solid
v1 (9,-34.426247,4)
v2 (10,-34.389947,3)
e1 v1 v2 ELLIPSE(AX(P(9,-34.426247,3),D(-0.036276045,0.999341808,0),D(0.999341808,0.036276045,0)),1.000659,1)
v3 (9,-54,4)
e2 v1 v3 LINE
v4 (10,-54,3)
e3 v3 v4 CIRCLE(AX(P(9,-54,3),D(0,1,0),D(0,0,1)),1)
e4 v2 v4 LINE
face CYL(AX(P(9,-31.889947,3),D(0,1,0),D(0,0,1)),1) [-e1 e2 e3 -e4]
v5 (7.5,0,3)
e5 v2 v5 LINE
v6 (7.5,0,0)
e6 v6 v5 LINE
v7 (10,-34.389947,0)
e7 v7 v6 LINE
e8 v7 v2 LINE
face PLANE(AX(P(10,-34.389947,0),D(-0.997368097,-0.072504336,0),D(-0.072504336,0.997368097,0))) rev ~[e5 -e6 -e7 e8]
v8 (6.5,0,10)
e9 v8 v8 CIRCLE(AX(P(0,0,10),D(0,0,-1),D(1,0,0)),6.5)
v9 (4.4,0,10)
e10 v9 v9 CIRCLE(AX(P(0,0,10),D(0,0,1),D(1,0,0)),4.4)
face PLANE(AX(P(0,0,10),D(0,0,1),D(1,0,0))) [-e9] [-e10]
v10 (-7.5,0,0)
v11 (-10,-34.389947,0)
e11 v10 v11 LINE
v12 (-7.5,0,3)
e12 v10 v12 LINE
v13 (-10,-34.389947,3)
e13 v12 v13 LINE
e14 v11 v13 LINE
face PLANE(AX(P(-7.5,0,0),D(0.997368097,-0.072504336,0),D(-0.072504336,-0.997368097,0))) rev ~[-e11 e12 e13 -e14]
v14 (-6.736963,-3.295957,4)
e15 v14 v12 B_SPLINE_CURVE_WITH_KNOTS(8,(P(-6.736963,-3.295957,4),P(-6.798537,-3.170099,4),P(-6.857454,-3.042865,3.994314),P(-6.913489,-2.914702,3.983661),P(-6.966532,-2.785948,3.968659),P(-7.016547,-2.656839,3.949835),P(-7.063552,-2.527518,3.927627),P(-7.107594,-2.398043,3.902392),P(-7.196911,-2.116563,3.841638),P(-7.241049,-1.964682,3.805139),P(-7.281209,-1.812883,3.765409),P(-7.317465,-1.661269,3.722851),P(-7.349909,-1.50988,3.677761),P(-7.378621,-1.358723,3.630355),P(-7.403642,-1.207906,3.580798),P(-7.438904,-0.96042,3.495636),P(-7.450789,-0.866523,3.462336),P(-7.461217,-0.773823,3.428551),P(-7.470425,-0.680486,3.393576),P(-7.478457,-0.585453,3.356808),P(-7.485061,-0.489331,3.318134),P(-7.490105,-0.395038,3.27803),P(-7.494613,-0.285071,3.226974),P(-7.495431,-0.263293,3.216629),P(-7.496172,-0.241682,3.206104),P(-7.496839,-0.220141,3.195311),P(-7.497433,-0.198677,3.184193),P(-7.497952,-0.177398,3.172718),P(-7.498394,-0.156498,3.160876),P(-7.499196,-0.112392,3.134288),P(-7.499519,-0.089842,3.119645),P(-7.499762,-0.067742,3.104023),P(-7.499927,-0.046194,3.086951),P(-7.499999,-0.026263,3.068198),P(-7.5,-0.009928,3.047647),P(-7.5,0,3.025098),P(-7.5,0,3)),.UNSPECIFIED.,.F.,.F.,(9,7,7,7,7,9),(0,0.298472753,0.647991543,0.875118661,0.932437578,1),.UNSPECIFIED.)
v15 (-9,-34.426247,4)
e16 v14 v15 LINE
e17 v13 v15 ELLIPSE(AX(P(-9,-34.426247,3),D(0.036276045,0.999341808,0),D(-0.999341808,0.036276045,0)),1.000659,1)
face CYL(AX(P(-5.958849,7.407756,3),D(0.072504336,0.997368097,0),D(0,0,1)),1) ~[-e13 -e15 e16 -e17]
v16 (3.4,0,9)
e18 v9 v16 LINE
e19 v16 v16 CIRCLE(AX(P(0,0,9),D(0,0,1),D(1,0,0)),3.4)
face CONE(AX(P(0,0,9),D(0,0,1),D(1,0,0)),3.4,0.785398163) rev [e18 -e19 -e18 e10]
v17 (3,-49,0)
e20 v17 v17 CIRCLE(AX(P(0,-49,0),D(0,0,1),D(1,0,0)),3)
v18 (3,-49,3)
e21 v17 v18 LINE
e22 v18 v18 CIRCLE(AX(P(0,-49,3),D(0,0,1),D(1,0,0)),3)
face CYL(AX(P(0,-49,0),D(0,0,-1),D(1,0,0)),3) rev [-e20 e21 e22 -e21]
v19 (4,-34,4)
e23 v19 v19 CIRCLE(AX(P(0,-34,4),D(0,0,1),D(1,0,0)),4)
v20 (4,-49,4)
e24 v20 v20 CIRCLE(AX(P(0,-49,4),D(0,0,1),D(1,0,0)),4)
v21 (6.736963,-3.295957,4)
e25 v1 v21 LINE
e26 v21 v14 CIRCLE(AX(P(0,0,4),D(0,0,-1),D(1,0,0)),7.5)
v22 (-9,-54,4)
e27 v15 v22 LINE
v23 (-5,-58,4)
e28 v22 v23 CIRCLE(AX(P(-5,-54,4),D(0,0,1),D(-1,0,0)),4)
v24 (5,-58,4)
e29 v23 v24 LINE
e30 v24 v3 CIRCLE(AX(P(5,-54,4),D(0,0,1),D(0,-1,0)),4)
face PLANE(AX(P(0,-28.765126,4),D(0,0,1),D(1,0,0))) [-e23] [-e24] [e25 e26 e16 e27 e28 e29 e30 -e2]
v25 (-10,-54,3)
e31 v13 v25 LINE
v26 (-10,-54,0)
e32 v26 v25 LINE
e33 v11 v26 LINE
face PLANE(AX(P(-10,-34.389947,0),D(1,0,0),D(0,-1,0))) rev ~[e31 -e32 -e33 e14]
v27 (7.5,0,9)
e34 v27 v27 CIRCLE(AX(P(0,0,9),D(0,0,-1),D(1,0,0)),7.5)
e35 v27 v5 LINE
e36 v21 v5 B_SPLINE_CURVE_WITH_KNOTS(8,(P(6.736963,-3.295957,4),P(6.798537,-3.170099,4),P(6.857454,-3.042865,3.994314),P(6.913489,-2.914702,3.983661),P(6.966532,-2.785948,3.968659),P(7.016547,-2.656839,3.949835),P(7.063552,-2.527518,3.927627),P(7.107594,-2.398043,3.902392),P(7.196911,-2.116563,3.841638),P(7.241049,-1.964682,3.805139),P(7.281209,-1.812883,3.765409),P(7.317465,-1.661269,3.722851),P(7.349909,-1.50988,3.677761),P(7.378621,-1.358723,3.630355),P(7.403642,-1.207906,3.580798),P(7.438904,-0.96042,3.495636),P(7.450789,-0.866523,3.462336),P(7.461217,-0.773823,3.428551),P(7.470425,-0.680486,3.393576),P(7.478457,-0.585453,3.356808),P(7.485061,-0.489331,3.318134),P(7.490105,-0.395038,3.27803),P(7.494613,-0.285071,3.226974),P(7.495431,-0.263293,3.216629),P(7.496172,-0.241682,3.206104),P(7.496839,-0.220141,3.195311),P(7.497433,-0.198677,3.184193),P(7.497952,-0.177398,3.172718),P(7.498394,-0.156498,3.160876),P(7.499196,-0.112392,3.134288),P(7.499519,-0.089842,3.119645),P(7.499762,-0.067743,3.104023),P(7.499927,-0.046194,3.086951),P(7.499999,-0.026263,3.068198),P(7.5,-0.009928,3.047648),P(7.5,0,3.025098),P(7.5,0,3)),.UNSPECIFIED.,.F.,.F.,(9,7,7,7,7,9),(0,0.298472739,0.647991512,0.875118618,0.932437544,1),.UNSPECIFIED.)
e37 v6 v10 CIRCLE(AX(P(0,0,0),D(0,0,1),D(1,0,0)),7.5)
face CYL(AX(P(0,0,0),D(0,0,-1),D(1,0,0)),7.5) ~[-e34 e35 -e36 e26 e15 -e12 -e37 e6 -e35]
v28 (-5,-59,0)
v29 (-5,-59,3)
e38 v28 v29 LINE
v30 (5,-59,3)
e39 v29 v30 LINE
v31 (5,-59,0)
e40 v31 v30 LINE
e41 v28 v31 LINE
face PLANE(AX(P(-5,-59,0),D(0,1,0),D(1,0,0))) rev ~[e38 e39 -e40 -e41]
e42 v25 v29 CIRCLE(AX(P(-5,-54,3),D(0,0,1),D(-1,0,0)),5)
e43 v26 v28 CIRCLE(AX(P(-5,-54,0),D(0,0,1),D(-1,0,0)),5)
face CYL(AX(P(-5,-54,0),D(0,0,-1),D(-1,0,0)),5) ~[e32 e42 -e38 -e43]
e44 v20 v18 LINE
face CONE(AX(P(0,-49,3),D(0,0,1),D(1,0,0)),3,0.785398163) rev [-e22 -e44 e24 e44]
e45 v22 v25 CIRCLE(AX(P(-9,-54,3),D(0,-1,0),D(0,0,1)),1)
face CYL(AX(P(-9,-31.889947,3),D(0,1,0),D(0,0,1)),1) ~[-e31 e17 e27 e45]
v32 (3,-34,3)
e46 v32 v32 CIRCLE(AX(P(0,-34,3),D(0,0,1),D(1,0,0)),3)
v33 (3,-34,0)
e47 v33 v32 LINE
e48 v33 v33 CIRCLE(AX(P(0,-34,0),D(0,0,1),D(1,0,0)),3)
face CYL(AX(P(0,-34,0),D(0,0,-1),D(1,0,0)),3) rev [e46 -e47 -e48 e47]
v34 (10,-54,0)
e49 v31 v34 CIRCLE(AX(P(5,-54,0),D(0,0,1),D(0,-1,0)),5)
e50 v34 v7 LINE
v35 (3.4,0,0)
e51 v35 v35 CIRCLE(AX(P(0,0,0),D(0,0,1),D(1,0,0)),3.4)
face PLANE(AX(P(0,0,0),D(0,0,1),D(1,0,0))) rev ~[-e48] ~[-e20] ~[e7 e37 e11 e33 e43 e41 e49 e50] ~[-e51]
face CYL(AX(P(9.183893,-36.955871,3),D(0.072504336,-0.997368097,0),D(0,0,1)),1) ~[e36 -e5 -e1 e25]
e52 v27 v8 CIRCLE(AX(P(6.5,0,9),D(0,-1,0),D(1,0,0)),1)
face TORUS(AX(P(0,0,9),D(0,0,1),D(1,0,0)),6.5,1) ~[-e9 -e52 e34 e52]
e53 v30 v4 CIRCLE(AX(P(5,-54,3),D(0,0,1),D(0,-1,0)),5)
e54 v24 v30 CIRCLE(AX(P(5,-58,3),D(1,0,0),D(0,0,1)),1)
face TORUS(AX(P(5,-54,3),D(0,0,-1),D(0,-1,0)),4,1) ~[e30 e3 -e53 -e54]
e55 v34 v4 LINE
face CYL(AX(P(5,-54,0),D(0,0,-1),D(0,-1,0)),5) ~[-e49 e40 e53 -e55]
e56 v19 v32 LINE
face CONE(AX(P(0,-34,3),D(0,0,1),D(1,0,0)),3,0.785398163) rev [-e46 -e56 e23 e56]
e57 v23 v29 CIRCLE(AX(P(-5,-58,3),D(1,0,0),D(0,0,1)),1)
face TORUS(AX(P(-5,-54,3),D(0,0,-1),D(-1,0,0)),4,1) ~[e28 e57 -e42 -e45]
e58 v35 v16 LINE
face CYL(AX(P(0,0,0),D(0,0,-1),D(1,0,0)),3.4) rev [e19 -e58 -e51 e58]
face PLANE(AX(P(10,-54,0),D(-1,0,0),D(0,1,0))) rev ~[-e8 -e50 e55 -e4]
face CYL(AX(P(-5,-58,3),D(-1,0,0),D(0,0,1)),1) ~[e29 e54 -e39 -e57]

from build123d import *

# Parameters (mm, degrees)
F0_R         = 3
F1_DEPTH     = 4
F0_R_2       = 3.4
F2_DEPTH     = 10
F3_SIZE      = 1
F4_T1_DEPTH  = 22.1100533903
F4_T3_DEPTH  = 10
F4_T10_DEPTH = 44.4806964521
F4_S11_R     = 7.5
F4_T12_DEPTH = 24
F4_T14_ANGLE = 90
F4_T18_DEPTH = 44.4806964521
F4_S19_R     = 7.5
F4_T20_DEPTH = 24
F4_T22_ANGLE = 90


# Not quite as in the source:
# - a fillet or chamfer that OpenCascade refuses, or shapes differently, is made with other operations: its cross-section is extruded or revolved along the edge and cut away or added


with BuildPart() as f1:
    # F0 (on Top) → F1 (new body)
    with BuildSketch(Plane.XY):
        with BuildLine():
            Line((10, -34.3899466097), (7.5, 0))
            ThreePointArc((7.5, 0), (0, -7.5), (-7.5, 0))
            Line((-7.5, 0), (-10, -34.3899466097))
            Line((-10, -34.3899466097), (-10, -54))
            ThreePointArc((-10, -54), (-8.5355339059, -57.5355339059), (-5, -59))
            Line((-5, -59), (5, -59))
            ThreePointArc((5, -59), (8.5355339059, -57.5355339059), (10, -54))
            Line((10, -54), (10, -34.3899466097))
        make_face()
        with Locations((0, -49)):
            Circle(F0_R, mode=Mode.SUBTRACT)
        with Locations((0, -34)):
            Circle(F0_R, mode=Mode.SUBTRACT)
    extrude(amount=F1_DEPTH)

    # F0 (on Top) → F2 (join)
    with BuildSketch(Plane.XY):
        with BuildLine():
            ThreePointArc((-7.5, 0), (0, -7.5), (7.5, 0))
            ThreePointArc((7.5, 0), (0, 7.5), (-7.5, 0))
        make_face()
        Circle(F0_R_2, mode=Mode.SUBTRACT)
    extrude(amount=F2_DEPTH)

    # F3
    f3_edges = [f1.edges().sort_by_distance(p)[0] for p in [
        (-3, -34, 4),
        (-3, -49, 4),
        (-3.4, 0, 10),
    ]]
    chamfer(f3_edges, length=F3_SIZE)

    # F4: fillet of radius 1 on 5 edges, made by hand

    # F4_s2 → F4_t1 (cut)
    with BuildSketch(Plane.XZ.offset(31.8899466097)):
        with BuildLine():
            ThreePointArc((-9, 4), (-9.7071067812, 3.7071067812), (-10, 3))
            Line((-10, 3), (-10, 4))
            Line((-10, 4), (-9, 4))
        make_face()
        with BuildLine():
            ThreePointArc((9, 4), (9.7071067812, 3.7071067812), (10, 3))
            Line((10, 3), (10, 4))
            Line((10, 4), (9, 4))
        make_face()
    extrude(amount=F4_T1_DEPTH, mode=Mode.SUBTRACT)

    # F4_s4 → F4_t3 (cut)
    with BuildSketch(Plane.YZ.offset(-5)):
        with BuildLine():
            ThreePointArc((-58, 4), (-58.7071067812, 3.7071067812), (-59, 3))
            Line((-59, 3), (-59, 4))
            Line((-59, 4), (-58, 4))
        make_face()
    extrude(amount=F4_T3_DEPTH, mode=Mode.SUBTRACT)

    # F4_s5 → F4_t6 (revolve, cut)
    with BuildSketch(Plane.XZ):
        with BuildLine():
            ThreePointArc((7.5, 9), (7.2071067812, 9.7071067812), (6.5, 10))
            Line((6.5, 10), (7.5, 10))
            Line((7.5, 10), (7.5, 9))
        make_face()
    revolve(axis=Axis((0, 0, 10), (0, 0, -1)), mode=Mode.SUBTRACT)


with BuildPart() as f4_tool8:
    # F4_s9 → F4_t10 (new body)
    with BuildSketch(Plane(origin=(0.5043559293, 6.9379093918, 0), x_dir=(0, 0, 1), z_dir=(-0.072504336, -0.9973680972, 0))):
        with BuildLine():
            ThreePointArc((4, 6.4802607288), (3.7071067812, 7.18736751), (3, 7.4802607288))
            Line((3, 7.4802607288), (4, 7.4802607288))
            Line((4, 7.4802607288), (4, 6.4802607288))
        make_face()
    extrude(amount=F4_T10_DEPTH)

    # F4_s11 → F4_t12 (cut, symmetric)
    with BuildSketch(Plane.XY.offset(3.5)):
        Circle(F4_S11_R)
    extrude(amount=F4_T12_DEPTH, both=True, mode=Mode.SUBTRACT)


with BuildPart() as f1_1:
    add(f1.part)

    # F4_t7: cut F4_tool8
    add(f4_tool8.part, mode=Mode.SUBTRACT)

    # F4_s13 → F4_t14 (revolve, cut)
    with BuildSketch(Plane.XZ.offset(54)):
        with BuildLine():
            ThreePointArc((-9, 4), (-9.7071067812, 3.7071067812), (-10, 3))
            Line((-10, 3), (-10, 4))
            Line((-10, 4), (-9, 4))
        make_face()
    revolve(axis=Axis((-5, -54, 4), (0, 0, 1)), revolution_arc=F4_T14_ANGLE, mode=Mode.SUBTRACT)


with BuildPart() as f4_tool16:
    # F4_s17 → F4_t18 (new body)
    with BuildSketch(Plane(origin=(2.7206874304, -37.4257181897, 0), x_dir=(0, 0, 1), z_dir=(-0.072504336, 0.9973680972, 0))):
        with BuildLine():
            ThreePointArc((4, 6.4802607288), (3.7071067812, 7.18736751), (3, 7.4802607288))
            Line((3, 7.4802607288), (4, 7.4802607288))
            Line((4, 7.4802607288), (4, 6.4802607288))
        make_face()
    extrude(amount=F4_T18_DEPTH)

    # F4_s19 → F4_t20 (cut, symmetric)
    with BuildSketch(Plane.XY.offset(3.5)):
        Circle(F4_S19_R)
    extrude(amount=F4_T20_DEPTH, both=True, mode=Mode.SUBTRACT)


with BuildPart() as f1_2:
    add(f1_1.part)

    # F4_t15: cut F4_tool16
    add(f4_tool16.part, mode=Mode.SUBTRACT)

    # F4_s21 → F4_t22 (revolve, cut)
    with BuildSketch(Plane.YZ.offset(5)):
        with BuildLine():
            ThreePointArc((-58, 4), (-58.7071067812, 3.7071067812), (-59, 3))
            Line((-59, 3), (-59, 4))
            Line((-59, 4), (-58, 4))
        make_face()
    revolve(axis=Axis((5, -54, 4), (0, 0, 1)), revolution_arc=F4_T22_ANGLE, mode=Mode.SUBTRACT)


solid = f1_2.part
